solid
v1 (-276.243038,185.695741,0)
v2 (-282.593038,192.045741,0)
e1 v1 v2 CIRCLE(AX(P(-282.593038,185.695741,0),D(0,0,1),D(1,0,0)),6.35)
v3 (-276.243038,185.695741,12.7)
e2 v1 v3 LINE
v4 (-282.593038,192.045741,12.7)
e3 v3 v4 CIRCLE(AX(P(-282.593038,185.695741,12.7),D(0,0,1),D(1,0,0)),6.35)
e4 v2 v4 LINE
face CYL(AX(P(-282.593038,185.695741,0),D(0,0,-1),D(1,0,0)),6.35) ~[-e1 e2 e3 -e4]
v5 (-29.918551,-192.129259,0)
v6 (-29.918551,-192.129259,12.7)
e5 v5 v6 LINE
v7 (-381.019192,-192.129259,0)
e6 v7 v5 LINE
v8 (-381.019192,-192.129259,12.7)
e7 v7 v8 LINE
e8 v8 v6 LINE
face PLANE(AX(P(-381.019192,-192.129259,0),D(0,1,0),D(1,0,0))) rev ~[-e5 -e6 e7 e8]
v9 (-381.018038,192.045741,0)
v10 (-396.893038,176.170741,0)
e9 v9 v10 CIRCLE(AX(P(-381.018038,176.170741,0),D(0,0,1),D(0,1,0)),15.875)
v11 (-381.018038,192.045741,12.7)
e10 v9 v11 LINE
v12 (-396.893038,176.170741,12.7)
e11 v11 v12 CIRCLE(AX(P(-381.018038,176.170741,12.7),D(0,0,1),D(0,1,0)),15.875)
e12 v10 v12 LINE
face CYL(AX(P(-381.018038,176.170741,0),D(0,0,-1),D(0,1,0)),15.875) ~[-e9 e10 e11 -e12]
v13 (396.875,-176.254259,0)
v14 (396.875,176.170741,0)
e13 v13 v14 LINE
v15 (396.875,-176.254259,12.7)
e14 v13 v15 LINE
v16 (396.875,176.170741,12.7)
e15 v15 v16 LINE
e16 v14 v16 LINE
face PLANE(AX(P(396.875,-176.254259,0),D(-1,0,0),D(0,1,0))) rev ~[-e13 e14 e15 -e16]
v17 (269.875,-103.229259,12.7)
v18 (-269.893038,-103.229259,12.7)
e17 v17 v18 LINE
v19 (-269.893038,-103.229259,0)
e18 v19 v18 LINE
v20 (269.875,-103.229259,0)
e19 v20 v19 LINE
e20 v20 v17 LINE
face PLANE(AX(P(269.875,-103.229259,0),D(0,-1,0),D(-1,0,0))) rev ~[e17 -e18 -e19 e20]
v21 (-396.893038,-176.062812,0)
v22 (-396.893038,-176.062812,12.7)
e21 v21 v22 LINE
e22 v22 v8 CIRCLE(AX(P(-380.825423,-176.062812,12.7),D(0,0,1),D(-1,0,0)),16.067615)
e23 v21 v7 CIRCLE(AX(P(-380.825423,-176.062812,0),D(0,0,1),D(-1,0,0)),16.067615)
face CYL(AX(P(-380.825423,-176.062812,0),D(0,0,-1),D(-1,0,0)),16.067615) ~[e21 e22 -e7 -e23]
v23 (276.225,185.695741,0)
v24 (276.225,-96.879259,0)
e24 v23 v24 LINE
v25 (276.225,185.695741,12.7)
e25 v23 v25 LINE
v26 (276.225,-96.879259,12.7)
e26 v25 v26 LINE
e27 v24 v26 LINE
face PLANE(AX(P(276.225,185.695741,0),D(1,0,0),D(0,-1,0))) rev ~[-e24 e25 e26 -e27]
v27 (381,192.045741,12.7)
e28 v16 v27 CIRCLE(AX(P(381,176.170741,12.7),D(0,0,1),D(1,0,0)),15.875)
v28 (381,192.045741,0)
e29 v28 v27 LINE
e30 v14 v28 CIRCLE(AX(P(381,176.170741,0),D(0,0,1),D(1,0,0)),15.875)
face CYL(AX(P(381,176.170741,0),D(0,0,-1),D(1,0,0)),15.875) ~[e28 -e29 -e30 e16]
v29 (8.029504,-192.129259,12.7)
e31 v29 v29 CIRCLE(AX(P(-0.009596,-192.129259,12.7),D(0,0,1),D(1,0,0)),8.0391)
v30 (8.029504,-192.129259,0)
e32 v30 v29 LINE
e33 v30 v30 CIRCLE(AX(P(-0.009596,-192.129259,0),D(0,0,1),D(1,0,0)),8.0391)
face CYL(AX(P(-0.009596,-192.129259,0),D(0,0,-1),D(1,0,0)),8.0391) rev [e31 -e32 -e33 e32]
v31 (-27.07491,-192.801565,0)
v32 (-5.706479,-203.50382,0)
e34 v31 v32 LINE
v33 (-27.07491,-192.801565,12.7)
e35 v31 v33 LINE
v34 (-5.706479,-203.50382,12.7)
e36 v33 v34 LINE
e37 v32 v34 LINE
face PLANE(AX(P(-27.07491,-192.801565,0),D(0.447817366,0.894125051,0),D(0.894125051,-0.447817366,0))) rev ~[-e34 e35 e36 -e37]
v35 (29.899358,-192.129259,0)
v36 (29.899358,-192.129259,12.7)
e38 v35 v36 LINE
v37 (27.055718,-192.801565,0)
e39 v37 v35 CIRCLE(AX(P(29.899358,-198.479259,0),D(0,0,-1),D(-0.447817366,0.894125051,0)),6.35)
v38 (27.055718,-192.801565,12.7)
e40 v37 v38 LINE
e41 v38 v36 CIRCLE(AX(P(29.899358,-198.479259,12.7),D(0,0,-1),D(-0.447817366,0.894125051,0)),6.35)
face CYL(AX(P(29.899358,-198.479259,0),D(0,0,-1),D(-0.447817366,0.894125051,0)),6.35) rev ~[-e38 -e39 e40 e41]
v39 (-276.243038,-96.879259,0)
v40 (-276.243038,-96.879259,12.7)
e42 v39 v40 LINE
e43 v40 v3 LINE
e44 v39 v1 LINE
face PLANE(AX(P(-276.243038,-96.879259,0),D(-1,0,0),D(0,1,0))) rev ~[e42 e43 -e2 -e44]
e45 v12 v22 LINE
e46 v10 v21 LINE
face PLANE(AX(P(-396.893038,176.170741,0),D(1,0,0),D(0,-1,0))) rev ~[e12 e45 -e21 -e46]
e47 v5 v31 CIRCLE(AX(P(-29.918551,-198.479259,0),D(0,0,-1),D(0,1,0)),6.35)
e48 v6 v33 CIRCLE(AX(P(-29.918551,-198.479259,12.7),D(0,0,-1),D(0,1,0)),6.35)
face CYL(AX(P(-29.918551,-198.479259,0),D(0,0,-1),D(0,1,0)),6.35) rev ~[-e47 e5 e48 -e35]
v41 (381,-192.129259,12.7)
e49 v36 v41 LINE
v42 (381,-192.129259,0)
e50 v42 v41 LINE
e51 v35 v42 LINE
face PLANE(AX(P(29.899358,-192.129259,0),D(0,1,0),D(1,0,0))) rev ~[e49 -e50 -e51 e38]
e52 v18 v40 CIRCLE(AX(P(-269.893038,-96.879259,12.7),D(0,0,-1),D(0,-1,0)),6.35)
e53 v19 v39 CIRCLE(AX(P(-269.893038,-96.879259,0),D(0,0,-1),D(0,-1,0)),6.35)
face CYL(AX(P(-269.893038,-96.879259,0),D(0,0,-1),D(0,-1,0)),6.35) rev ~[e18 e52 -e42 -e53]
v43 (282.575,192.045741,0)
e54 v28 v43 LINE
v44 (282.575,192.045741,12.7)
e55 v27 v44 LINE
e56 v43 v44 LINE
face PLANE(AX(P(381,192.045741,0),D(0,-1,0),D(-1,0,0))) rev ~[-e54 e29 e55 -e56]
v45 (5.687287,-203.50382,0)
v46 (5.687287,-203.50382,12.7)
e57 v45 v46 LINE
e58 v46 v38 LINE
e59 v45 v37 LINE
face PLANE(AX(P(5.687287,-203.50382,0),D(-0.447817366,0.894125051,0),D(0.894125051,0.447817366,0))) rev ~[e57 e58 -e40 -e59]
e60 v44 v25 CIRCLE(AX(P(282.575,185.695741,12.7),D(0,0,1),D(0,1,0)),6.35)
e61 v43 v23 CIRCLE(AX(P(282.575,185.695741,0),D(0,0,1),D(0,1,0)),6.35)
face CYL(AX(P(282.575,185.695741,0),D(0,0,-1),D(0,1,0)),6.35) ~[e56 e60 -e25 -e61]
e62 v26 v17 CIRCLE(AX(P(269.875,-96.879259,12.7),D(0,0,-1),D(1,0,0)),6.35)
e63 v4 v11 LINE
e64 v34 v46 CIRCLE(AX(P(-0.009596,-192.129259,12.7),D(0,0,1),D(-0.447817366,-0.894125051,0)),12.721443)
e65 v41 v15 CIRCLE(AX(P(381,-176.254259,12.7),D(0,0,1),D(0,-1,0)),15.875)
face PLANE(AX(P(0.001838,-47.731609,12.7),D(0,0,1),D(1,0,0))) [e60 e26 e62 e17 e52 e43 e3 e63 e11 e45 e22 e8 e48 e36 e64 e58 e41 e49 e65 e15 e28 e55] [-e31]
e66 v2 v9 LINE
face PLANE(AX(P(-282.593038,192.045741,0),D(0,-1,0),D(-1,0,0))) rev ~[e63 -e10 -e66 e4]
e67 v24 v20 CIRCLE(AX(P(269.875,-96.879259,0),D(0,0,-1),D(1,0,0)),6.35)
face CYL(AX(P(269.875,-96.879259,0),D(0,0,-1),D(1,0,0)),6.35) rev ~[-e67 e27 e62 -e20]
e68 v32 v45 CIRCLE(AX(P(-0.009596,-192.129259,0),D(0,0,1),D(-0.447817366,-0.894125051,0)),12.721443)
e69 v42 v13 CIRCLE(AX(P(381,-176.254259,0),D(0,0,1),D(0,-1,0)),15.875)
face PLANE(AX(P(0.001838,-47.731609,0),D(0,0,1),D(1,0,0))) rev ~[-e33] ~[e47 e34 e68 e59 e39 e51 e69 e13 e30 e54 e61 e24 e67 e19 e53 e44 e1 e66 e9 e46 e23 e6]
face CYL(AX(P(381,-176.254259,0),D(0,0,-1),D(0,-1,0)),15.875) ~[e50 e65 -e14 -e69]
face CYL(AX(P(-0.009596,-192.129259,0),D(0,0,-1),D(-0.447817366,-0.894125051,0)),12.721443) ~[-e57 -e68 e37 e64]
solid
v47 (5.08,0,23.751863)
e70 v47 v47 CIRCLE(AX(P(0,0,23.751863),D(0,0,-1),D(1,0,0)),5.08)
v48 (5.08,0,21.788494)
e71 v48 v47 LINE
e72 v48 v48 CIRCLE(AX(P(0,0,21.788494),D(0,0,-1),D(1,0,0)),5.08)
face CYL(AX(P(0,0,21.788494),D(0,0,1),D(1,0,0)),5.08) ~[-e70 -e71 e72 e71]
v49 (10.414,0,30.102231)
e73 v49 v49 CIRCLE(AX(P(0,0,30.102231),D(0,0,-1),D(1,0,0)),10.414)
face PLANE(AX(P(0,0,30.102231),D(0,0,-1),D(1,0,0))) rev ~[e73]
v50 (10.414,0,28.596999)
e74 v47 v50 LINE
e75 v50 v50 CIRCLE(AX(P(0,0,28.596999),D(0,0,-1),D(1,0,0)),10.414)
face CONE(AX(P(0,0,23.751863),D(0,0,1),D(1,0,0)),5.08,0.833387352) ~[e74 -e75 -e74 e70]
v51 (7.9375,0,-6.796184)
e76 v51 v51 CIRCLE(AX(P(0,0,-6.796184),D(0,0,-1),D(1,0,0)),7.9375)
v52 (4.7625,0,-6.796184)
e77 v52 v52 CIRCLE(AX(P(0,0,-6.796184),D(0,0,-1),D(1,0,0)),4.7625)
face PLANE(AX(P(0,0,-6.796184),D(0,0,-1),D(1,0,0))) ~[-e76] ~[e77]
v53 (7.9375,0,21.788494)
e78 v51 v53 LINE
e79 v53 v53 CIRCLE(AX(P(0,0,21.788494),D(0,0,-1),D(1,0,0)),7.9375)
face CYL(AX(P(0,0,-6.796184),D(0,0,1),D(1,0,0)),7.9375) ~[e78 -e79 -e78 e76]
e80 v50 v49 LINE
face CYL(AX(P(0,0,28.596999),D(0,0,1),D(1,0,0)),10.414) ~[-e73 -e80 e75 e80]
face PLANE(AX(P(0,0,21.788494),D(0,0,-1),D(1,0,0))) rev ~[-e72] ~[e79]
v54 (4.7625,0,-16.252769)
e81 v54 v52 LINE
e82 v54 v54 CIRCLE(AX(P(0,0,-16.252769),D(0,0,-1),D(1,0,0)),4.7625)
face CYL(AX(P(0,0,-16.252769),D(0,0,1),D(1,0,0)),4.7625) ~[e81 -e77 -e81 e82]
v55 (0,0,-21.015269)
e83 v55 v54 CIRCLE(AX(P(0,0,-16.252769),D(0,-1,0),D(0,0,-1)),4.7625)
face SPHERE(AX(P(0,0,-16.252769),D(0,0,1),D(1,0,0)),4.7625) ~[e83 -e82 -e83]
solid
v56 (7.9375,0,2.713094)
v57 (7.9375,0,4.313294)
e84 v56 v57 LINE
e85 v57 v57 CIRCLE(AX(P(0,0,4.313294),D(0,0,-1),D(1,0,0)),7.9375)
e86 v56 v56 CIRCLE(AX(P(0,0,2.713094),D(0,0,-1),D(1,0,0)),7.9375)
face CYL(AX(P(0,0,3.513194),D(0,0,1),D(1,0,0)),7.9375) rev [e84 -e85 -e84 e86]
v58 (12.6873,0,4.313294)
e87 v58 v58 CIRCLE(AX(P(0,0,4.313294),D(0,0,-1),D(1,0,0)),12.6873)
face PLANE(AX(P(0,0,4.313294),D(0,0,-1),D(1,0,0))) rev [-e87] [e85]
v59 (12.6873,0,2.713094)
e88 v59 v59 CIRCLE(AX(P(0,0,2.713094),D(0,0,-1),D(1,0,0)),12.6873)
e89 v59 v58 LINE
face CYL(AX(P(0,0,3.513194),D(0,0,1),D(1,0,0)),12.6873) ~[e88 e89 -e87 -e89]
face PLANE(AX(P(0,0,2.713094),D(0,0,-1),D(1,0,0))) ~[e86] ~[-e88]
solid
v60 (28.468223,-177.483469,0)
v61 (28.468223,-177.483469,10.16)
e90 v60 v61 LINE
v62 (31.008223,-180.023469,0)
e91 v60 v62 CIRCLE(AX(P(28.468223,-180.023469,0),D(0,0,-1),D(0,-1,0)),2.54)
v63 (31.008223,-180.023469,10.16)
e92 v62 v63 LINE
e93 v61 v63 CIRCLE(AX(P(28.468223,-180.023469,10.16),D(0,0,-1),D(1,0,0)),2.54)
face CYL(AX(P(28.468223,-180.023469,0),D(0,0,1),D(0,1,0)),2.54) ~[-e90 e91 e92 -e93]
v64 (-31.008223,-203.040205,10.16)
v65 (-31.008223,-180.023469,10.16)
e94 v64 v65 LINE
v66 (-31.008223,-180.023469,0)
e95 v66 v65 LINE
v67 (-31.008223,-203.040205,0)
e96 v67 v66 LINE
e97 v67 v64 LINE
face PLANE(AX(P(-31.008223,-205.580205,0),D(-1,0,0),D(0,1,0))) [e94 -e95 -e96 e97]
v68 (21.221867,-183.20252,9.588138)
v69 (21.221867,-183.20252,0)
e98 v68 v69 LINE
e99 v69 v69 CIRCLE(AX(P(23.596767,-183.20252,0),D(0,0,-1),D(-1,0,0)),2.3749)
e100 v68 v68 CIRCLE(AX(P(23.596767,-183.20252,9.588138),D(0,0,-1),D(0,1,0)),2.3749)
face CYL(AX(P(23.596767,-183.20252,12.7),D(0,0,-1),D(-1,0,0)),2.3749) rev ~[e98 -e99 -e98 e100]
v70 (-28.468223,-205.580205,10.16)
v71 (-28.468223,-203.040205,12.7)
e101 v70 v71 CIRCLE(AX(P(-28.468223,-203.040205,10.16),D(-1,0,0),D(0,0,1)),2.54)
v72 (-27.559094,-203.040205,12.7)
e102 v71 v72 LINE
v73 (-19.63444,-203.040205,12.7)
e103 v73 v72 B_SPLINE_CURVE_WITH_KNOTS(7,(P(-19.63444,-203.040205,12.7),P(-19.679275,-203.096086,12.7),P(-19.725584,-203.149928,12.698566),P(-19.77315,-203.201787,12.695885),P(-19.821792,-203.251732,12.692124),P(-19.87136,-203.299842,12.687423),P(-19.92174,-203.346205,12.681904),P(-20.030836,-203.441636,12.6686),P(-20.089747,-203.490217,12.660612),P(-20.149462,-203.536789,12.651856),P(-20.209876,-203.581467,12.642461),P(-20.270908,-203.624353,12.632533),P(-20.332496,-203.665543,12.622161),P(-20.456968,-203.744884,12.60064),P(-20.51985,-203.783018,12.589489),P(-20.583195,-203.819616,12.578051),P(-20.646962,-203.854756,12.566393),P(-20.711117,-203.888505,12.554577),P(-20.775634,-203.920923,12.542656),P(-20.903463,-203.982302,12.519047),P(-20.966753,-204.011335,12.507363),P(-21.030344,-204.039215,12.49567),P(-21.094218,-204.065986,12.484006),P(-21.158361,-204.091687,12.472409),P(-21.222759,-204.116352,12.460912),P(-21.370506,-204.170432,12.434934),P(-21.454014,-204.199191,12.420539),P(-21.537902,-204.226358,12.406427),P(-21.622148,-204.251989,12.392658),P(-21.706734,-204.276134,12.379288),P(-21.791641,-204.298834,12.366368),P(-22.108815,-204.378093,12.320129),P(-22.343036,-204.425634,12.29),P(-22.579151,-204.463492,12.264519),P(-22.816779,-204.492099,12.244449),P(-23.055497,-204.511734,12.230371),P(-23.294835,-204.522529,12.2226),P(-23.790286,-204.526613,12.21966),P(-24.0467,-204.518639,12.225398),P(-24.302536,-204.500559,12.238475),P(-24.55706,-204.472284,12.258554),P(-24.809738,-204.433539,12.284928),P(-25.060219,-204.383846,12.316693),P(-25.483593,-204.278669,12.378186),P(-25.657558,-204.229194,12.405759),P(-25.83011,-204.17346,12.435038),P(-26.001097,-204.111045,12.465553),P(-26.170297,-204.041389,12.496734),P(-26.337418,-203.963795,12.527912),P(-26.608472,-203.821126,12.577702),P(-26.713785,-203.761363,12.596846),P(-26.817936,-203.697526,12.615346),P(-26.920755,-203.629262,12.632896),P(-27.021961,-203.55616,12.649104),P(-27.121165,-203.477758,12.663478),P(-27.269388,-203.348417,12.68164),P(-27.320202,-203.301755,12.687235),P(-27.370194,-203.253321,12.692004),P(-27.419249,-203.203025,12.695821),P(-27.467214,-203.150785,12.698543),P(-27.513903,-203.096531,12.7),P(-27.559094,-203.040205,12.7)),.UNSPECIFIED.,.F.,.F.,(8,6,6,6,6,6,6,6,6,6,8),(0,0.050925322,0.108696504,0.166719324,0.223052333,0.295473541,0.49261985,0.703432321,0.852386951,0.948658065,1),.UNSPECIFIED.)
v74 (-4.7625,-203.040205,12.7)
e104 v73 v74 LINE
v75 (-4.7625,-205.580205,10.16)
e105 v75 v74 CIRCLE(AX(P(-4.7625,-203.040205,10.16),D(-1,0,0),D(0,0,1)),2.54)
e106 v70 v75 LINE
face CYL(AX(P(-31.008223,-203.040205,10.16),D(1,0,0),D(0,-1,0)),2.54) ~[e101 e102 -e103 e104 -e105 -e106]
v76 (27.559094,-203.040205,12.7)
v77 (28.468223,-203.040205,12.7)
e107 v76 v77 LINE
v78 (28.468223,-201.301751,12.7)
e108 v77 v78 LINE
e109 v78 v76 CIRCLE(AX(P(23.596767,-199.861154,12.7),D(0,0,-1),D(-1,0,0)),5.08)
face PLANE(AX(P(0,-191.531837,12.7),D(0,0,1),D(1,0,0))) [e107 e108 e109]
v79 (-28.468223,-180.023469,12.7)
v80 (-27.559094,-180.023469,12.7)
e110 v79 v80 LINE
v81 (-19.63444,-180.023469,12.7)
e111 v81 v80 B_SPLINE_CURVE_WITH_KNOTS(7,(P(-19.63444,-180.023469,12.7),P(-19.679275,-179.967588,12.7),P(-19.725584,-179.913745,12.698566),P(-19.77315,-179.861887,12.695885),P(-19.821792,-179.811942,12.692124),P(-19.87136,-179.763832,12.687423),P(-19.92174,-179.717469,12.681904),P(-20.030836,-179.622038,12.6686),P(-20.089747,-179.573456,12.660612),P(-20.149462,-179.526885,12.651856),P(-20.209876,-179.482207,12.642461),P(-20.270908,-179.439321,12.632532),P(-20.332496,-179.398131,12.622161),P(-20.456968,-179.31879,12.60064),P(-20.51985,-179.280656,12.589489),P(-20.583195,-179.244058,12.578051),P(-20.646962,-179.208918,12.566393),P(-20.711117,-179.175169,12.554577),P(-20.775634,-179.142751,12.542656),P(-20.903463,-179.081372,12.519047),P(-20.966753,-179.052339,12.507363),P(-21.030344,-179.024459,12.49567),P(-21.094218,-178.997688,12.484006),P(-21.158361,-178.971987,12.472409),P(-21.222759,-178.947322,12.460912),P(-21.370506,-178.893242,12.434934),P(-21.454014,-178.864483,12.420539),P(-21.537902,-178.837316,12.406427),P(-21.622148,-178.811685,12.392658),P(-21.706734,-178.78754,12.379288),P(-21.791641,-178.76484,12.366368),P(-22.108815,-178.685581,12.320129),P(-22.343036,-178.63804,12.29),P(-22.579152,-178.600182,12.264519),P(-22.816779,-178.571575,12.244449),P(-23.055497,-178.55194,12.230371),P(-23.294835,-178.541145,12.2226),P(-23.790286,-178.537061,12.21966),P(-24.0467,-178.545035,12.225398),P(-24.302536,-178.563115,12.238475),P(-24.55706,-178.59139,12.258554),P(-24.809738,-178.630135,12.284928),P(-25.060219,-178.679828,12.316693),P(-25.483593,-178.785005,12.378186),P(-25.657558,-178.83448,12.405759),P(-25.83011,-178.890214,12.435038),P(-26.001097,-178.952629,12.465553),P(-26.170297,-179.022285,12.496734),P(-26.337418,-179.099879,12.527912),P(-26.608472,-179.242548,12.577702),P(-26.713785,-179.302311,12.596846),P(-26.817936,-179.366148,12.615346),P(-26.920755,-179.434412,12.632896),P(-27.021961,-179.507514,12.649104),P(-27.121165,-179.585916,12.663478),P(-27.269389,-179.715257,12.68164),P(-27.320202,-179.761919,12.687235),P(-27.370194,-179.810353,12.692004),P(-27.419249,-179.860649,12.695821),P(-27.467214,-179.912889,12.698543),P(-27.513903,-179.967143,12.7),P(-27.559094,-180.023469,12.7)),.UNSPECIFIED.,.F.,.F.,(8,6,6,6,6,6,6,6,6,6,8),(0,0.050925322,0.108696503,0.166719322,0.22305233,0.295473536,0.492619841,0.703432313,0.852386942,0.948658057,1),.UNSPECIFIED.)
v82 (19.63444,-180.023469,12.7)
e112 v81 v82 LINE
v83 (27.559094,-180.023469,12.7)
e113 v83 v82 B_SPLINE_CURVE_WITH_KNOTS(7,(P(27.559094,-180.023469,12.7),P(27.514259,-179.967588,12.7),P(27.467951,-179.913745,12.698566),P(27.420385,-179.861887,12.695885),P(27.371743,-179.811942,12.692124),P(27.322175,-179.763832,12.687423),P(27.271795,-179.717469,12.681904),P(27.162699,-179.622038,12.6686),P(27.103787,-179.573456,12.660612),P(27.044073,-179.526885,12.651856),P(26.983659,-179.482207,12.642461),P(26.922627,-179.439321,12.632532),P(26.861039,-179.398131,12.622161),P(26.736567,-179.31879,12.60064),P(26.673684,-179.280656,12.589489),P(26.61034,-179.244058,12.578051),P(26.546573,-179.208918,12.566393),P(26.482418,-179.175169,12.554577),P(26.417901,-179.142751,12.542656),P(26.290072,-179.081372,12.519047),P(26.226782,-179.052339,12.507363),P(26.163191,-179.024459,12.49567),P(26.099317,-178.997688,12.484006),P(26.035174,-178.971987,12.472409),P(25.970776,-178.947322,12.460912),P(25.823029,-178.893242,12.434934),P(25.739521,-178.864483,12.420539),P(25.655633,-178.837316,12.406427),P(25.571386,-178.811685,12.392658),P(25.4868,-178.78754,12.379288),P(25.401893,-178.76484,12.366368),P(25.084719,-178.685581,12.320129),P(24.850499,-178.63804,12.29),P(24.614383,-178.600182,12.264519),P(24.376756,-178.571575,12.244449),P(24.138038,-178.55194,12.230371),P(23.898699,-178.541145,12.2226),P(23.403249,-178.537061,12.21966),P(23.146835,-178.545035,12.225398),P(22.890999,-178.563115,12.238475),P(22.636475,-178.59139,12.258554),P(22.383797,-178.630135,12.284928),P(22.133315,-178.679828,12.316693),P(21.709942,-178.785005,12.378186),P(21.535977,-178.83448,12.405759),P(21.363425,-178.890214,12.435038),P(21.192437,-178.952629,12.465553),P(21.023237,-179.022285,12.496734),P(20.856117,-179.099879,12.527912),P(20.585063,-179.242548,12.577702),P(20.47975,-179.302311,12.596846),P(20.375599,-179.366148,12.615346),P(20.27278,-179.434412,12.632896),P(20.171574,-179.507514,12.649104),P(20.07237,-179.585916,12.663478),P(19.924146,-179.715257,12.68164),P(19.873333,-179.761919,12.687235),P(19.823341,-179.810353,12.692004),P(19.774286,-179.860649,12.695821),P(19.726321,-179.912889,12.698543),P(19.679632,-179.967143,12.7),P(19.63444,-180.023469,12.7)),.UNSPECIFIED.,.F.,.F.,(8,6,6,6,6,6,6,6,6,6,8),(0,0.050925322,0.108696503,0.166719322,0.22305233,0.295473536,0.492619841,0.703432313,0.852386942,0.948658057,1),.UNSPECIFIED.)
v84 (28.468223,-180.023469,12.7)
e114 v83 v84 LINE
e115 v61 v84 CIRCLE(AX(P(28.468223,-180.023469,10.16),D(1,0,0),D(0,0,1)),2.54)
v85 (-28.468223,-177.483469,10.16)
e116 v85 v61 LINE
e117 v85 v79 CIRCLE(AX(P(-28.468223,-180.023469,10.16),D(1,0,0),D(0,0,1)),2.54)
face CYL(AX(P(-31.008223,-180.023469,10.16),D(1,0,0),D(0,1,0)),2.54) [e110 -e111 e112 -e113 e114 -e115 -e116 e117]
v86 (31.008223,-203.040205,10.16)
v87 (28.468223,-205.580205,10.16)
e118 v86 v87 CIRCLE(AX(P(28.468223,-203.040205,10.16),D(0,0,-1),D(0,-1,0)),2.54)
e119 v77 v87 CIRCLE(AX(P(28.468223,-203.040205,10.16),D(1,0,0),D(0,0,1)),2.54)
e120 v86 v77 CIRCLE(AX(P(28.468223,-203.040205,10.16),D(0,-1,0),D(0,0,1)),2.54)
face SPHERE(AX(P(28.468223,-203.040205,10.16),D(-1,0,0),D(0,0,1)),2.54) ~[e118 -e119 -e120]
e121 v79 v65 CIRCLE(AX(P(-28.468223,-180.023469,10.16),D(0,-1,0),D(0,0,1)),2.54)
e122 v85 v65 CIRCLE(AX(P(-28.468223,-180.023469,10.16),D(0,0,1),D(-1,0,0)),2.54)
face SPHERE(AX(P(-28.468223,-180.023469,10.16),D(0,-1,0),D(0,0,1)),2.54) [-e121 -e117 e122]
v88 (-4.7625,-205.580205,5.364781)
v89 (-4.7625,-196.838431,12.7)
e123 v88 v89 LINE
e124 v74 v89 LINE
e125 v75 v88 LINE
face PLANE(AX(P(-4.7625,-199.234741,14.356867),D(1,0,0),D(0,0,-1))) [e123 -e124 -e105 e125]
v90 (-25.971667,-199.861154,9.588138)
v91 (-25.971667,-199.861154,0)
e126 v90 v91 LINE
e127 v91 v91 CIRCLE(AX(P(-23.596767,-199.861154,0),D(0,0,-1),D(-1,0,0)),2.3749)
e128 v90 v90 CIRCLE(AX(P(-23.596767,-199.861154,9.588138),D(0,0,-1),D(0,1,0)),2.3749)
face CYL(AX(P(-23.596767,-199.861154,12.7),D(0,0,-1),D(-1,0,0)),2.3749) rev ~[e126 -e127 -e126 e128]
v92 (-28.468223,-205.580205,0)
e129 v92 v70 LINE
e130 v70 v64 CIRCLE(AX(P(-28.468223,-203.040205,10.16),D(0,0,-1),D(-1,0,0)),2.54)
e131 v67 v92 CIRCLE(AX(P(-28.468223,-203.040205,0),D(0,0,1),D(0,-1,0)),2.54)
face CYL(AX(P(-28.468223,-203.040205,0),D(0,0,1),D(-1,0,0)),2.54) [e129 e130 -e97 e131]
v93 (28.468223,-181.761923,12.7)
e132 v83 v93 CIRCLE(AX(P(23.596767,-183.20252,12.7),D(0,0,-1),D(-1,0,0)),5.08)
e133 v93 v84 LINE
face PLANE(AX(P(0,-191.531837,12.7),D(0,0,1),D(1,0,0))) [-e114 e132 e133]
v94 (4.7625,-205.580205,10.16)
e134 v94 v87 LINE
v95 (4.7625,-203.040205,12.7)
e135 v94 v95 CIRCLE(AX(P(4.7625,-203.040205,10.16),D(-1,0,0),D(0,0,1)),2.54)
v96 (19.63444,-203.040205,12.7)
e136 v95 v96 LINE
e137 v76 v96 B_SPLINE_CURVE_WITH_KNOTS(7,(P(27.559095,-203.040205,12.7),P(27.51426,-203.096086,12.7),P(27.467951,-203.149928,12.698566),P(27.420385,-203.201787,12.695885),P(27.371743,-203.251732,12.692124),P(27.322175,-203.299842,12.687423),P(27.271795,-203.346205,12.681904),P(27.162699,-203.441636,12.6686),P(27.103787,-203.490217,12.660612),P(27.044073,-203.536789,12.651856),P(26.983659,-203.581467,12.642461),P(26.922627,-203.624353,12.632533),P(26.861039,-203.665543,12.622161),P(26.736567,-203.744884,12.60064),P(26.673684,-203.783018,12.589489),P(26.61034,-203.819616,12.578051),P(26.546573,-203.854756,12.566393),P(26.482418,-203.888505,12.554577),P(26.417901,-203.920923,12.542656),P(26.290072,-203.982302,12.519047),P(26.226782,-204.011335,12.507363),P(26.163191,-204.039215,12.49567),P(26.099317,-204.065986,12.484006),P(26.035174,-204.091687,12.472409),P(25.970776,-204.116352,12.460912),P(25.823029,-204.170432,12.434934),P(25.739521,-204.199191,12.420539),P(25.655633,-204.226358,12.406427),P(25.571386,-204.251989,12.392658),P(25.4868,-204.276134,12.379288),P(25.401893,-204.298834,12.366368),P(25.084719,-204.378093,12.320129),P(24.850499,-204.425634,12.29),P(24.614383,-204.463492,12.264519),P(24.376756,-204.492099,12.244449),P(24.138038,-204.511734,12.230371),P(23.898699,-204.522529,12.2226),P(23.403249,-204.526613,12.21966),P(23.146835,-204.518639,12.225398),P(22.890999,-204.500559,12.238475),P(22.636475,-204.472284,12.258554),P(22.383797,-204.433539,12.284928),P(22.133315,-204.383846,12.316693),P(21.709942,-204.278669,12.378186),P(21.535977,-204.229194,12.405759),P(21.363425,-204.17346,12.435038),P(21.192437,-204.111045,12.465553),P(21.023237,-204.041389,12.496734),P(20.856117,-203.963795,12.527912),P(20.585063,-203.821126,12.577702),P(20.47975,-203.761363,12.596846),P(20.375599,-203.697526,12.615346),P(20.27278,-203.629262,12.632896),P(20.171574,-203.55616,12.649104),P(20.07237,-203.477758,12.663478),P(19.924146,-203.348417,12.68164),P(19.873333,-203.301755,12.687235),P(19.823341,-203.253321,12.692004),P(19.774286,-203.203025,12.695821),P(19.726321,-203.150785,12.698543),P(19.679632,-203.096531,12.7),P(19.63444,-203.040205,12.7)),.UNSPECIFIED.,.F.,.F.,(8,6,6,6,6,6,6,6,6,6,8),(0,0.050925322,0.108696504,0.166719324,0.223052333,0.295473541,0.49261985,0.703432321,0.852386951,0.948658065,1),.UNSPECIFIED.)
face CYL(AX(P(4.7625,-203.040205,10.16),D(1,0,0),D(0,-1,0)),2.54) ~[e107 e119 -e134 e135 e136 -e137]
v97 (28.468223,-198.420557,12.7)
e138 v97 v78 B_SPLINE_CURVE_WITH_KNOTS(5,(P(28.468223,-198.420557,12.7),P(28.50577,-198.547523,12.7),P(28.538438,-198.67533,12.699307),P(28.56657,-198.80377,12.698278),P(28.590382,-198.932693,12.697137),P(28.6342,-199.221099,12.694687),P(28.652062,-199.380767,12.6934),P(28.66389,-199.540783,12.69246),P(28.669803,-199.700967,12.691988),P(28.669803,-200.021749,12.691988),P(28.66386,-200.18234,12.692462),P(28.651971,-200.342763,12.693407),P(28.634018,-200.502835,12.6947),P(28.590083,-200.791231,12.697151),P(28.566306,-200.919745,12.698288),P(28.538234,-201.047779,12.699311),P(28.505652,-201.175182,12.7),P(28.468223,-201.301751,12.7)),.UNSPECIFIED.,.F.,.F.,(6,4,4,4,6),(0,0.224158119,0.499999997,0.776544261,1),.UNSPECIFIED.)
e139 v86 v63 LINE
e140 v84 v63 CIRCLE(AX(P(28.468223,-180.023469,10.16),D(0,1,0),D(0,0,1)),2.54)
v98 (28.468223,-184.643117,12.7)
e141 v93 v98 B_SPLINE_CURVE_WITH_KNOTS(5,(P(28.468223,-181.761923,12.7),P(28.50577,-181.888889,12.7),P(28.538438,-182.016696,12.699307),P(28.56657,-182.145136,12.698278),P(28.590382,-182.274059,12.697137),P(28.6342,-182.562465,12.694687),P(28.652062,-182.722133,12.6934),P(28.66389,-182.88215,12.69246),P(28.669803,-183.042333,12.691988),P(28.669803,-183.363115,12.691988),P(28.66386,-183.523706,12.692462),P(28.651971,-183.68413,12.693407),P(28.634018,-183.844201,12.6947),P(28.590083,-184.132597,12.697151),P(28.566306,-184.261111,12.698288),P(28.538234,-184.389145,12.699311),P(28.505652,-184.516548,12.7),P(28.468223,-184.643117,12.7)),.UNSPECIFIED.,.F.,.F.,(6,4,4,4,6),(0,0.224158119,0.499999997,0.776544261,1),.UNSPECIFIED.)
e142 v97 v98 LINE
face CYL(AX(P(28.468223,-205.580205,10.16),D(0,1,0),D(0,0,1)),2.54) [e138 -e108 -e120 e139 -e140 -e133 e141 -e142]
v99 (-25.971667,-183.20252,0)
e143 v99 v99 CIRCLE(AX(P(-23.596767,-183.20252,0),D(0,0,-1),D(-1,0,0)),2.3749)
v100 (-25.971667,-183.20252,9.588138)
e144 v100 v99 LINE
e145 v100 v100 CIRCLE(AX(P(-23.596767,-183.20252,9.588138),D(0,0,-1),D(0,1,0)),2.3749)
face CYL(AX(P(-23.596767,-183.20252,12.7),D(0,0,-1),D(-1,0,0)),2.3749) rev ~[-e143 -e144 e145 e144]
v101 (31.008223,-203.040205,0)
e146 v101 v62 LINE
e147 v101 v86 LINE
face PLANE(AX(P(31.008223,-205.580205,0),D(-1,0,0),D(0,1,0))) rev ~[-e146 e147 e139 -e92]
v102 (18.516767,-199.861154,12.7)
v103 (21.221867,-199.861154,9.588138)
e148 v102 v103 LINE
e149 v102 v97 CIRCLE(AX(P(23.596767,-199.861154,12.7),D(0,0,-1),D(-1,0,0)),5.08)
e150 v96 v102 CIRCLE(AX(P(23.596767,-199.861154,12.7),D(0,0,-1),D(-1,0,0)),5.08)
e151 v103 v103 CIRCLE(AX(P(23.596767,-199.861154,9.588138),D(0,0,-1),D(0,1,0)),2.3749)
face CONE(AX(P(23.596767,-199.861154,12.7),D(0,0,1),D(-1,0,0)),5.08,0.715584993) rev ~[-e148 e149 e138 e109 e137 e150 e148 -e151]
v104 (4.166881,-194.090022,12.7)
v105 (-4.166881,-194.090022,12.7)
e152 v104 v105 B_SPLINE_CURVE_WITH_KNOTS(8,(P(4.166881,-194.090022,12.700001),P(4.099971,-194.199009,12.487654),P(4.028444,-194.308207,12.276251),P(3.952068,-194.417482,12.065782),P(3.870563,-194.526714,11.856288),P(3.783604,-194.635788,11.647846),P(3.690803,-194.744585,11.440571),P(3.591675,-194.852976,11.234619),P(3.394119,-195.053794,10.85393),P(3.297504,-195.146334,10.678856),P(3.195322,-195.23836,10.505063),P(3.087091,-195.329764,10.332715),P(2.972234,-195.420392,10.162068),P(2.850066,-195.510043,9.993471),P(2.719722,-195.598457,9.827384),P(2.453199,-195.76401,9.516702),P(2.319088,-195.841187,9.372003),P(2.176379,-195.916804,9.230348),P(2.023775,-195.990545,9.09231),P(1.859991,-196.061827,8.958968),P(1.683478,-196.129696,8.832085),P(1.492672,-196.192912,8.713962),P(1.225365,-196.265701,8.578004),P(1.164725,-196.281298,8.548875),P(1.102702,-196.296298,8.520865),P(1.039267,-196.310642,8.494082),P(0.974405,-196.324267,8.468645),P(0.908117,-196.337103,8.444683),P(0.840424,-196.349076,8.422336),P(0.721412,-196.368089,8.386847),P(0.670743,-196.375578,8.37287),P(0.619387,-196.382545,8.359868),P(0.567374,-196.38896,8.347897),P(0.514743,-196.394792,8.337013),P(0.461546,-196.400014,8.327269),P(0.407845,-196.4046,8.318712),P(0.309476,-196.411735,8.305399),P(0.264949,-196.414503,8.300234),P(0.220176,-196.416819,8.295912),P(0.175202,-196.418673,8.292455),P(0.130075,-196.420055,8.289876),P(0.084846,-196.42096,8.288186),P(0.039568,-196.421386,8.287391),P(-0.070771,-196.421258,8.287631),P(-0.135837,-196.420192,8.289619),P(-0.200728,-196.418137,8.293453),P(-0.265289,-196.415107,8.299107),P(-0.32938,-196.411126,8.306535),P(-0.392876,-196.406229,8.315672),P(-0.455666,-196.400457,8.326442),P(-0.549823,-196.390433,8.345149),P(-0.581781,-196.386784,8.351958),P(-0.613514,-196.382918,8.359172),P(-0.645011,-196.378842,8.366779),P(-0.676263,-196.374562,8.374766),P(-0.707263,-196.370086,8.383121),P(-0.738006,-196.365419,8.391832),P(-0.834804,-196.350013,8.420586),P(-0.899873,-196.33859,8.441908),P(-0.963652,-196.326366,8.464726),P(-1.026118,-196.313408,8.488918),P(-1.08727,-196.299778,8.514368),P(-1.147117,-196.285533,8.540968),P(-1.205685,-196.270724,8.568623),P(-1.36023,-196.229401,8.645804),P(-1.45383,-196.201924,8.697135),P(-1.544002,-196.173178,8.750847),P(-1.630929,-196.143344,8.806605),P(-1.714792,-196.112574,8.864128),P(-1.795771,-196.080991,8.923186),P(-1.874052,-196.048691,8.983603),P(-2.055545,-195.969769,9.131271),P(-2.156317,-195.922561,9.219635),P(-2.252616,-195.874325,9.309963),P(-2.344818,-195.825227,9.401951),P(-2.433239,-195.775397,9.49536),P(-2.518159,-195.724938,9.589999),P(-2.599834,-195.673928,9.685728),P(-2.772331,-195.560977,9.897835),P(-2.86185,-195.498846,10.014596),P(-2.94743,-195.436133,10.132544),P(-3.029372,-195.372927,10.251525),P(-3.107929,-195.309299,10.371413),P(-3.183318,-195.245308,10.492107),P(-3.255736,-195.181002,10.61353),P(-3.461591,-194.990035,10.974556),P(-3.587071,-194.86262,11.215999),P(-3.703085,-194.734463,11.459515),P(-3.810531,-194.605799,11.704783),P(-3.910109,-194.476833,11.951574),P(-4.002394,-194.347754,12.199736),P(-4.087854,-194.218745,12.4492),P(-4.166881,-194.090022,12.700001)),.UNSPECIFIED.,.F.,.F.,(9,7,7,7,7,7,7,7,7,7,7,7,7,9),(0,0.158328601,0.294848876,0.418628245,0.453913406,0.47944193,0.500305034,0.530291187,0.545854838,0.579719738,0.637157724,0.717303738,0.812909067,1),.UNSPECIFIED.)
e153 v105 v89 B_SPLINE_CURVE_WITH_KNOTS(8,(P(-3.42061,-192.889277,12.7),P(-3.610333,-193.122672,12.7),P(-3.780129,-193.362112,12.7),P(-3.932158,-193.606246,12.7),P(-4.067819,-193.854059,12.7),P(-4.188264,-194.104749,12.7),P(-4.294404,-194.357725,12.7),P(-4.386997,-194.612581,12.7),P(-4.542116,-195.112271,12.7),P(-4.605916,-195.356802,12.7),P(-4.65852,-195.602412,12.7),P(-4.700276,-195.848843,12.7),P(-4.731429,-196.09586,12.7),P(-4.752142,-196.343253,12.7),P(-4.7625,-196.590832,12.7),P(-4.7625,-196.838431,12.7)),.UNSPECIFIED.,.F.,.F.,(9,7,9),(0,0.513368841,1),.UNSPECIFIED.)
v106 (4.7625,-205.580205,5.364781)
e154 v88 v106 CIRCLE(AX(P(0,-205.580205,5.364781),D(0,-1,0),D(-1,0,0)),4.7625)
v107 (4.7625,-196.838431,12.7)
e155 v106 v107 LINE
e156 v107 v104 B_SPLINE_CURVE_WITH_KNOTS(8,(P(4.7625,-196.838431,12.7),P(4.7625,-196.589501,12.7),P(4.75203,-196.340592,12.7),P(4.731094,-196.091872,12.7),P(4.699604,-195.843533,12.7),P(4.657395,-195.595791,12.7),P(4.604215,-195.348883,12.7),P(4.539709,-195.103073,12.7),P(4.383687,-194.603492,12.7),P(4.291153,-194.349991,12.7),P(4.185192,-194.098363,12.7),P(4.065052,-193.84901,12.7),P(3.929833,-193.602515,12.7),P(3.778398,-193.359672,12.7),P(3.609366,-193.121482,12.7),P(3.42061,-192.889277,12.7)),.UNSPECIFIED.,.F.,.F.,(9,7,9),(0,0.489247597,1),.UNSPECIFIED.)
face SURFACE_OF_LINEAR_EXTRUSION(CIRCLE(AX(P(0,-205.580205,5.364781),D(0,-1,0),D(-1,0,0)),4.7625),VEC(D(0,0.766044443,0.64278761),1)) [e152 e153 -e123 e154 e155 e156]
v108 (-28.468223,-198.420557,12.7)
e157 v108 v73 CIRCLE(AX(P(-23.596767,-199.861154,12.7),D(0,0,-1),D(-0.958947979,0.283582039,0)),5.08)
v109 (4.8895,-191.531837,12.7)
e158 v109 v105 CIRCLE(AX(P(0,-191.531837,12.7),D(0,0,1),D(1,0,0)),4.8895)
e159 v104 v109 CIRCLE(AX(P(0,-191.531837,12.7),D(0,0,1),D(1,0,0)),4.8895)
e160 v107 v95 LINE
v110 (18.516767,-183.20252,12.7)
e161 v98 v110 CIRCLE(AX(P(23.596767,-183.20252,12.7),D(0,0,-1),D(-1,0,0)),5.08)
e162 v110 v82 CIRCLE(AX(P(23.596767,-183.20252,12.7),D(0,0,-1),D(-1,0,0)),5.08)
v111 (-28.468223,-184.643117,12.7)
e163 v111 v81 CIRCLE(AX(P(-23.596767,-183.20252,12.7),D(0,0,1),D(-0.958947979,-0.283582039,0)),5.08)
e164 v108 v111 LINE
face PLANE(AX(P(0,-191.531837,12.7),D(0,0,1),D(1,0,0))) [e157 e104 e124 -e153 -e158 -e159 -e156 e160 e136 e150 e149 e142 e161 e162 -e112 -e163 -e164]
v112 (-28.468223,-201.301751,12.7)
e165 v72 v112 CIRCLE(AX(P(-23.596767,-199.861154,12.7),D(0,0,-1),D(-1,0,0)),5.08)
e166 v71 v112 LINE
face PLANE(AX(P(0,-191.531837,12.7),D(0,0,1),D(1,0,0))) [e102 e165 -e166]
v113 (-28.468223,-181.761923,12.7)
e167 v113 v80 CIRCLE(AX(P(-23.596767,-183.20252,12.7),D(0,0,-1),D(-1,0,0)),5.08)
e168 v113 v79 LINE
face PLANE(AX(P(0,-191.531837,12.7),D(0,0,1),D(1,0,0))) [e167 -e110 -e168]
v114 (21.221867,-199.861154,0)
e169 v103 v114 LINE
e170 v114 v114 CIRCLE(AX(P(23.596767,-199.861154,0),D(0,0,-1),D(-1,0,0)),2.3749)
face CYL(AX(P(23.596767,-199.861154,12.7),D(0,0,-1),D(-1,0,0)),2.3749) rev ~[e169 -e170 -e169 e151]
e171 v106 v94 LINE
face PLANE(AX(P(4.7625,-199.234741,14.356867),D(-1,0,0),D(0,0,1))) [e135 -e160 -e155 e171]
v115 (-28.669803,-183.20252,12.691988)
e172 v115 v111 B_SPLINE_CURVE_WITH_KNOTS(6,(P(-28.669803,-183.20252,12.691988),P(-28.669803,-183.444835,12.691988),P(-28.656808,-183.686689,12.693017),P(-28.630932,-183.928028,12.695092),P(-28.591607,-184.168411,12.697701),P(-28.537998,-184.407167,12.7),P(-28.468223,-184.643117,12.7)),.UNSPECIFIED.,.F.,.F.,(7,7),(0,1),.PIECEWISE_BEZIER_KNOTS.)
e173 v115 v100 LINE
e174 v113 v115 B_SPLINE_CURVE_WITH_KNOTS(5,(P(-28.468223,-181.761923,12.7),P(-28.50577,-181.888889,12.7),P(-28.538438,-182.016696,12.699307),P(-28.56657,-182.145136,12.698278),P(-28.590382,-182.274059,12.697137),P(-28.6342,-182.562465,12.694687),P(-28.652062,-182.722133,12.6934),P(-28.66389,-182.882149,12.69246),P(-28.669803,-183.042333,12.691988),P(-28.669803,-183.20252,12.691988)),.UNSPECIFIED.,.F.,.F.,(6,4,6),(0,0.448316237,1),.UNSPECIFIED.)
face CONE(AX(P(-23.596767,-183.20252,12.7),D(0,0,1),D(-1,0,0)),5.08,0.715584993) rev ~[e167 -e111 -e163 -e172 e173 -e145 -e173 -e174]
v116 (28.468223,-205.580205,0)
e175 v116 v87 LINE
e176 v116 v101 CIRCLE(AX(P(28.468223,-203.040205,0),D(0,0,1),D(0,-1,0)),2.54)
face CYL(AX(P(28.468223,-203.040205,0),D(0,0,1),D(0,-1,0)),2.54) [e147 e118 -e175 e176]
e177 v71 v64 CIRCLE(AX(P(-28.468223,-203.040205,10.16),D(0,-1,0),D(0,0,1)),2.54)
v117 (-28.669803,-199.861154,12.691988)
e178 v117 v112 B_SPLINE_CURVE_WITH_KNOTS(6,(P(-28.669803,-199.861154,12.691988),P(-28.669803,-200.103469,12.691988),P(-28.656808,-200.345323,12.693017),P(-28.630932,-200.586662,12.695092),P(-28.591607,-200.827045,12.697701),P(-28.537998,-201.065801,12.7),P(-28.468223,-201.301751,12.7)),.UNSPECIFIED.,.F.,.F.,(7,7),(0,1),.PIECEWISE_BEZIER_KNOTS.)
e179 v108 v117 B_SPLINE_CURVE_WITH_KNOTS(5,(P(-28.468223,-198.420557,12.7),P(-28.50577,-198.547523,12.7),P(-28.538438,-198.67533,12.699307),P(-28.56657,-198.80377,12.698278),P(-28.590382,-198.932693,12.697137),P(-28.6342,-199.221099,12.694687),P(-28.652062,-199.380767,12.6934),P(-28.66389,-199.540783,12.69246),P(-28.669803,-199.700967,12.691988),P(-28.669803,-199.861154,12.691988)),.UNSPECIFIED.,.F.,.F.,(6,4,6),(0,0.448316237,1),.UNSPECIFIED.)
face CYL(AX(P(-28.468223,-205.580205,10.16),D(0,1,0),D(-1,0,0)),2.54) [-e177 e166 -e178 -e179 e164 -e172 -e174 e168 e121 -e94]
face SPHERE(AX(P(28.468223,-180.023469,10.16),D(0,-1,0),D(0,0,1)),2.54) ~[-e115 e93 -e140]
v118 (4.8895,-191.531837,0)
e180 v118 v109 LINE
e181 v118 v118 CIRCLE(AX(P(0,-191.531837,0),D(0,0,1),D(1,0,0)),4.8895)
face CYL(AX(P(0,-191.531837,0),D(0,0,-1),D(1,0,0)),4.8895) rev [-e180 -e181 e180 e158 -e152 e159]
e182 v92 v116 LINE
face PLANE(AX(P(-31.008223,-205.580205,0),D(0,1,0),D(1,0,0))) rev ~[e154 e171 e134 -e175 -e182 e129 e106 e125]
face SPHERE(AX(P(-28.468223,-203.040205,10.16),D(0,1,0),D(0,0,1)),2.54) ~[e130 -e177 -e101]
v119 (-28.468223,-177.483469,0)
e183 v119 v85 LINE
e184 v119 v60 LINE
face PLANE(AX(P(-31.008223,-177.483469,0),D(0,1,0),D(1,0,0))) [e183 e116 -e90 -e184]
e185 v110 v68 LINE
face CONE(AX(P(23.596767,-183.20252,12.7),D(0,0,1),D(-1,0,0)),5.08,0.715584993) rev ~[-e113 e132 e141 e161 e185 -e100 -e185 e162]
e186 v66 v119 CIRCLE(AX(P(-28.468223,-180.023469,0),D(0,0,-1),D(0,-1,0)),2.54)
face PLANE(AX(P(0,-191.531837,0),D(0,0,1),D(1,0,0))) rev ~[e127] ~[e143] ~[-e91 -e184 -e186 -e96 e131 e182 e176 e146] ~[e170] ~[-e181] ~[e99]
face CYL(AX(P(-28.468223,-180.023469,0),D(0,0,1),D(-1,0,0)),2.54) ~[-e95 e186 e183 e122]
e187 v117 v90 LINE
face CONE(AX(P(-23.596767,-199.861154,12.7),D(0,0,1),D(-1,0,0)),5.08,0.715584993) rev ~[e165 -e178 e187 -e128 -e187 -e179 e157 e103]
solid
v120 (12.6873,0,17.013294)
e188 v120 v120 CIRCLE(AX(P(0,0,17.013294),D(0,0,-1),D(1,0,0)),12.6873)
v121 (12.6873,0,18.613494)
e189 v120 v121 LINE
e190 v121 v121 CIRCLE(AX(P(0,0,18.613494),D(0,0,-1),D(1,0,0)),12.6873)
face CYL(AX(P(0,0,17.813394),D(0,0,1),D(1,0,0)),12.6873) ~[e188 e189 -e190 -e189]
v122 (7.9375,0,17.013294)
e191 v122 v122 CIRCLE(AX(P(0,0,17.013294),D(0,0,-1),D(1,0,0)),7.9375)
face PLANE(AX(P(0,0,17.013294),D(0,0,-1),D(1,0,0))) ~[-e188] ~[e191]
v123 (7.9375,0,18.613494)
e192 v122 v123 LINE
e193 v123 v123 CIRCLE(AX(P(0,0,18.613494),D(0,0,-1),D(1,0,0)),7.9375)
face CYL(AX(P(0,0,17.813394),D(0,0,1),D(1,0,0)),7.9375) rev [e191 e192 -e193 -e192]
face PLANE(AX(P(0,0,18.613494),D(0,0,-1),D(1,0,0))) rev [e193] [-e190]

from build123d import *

# Parameters (mm, degrees)
F0_R           = 8.0391
F1_DEPTH       = 12.7
F2_W           = 62.0164461434
F2_H           = 28.0967354774
F2_R           = 4.8895
F3_DEPTH       = 12.7
F7_R           = 2.54
F9_D           = 4.7498
F9_CSINK_D     = 10.16
F9_CSINK_ANGLE = 82
F10_W          = 4.7498
F10_H          = 1.6002


with BuildPart() as f1:
    # F0 (on Top) → F1 (new body)
    with BuildSketch(Plane.XY):
        with BuildLine():
            ThreePointArc((-396.8930379433, -176.0628120543), (-392.25524501, -187.3556160105), (-381.0191923747, -192.1292588187))
            Line((-381.0191923747, -192.1292588187), (-29.9185505861, -192.1292588187))
            ThreePointArc((-29.9185505861, -192.1292588187), (-28.4575333665, -192.2996205863), (-27.0749103125, -192.801564745))
            Line((-27.0749103125, -192.801564745), (-5.7064793941, -203.503819913))
            ThreePointArc((-5.7064793941, -203.503819913), (-0.0095961873, -204.8507020685), (5.6872870194, -203.503819913))
            Line((5.6872870194, -203.503819913), (27.0557179378, -192.801564745))
            ThreePointArc((27.0557179378, -192.801564745), (28.4383409918, -192.2996205863), (29.8993582114, -192.1292588187))
            Line((29.8993582114, -192.1292588187), (381, -192.1292588187))
            ThreePointArc((381, -192.1292588187), (392.2253201513, -187.4795789701), (396.875, -176.2542588187))
            Line((396.875, -176.2542588187), (396.875, 176.1707411813))
            ThreePointArc((396.875, 176.1707411813), (392.2253201513, 187.3960613326), (381, 192.0457411813))
            Line((381, 192.0457411813), (282.575, 192.0457411813))
            ThreePointArc((282.575, 192.0457411813), (278.0848719395, 190.1858692418), (276.225, 185.6957411813))
            Line((276.225, 185.6957411813), (276.225, -96.8792588187))
            ThreePointArc((276.225, -96.8792588187), (274.3651280605, -101.3693868793), (269.875, -103.2292588187))
            Line((269.875, -103.2292588187), (-269.8930379433, -103.2292588187))
            ThreePointArc((-269.8930379433, -103.2292588187), (-274.3831660038, -101.3693868793), (-276.2430379433, -96.8792588187))
            Line((-276.2430379433, -96.8792588187), (-276.2430379433, 185.6957411813))
            ThreePointArc((-276.2430379433, 185.6957411813), (-278.1029098828, 190.1858692418), (-282.5930379433, 192.0457411813))
            Line((-282.5930379433, 192.0457411813), (-381.0180379433, 192.0457411813))
            ThreePointArc((-381.0180379433, 192.0457411813), (-392.2433580946, 187.3960613326), (-396.8930379433, 176.1707411813))
            Line((-396.8930379433, 176.1707411813), (-396.8930379433, -176.0628120543))
        make_face()
        with Locations((-0.0095961873, -192.1292588187)):
            Circle(F0_R, mode=Mode.SUBTRACT)
    extrude(amount=F1_DEPTH)


with BuildPart() as f3:
    # F2 (on Top) → F3 (new body)
    with BuildSketch(Plane.XY):
        with Locations((0, -191.5318369865)):
            Rectangle(F2_W, F2_H)
        with Locations((0, -191.5318369865)):
            Circle(F2_R, mode=Mode.SUBTRACT)
    extrude(amount=F3_DEPTH)

    # F6: sweep along a path in F4
    with BuildLine(Plane.YZ) as f6_path:
        Line((-205.5802047253, 2.0510469544), (-192.8892766759, 12.7))
    # F5 (on face) → F6 (sweep, cut)
    with BuildSketch(Plane.XZ.offset(205.5802047253)):
        with BuildLine():
            Line((-4.7625, 12.7), (-4.7625, 5.3647807799))
            ThreePointArc((-4.7625, 5.3647807799), (0, 0.6022807799), (4.7625, 5.3647807799))
            Line((4.7625, 5.3647807799), (4.7625, 12.7))
            Line((4.7625, 12.7), (-4.7625, 12.7))
        make_face()
    sweep(path=f6_path.line, mode=Mode.SUBTRACT)

    # F7
    f7_edges = [f3.edges().sort_by_distance(p)[0] for p in [
        (-31.008223, -191.531837, 12.7),
        (-17.885362, -205.580205, 12.7),
        (17.885362, -205.580205, 12.7),
        (31.008223, -191.531837, 12.7),
        (0, -177.483469, 12.7),
        (31.008223, -205.580205, 6.35),
        (31.008223, -177.483469, 6.35),
        (-31.008223, -205.580205, 6.35),
        (-31.008223, -177.483469, 6.35),
    ]]
    fillet(f7_edges, radius=F7_R)

    # F9 (through all)
    with Locations(Plane.XY.offset(12.7)):
        with Locations((-23.5967673361, -183.2025200129), (23.5967673361, -183.2025200129), (23.5967673361, -199.8611539602), (-23.5967673361, -199.8611539602)):
            CounterSinkHole(F9_D / 2, F9_CSINK_D / 2, counter_sink_angle=F9_CSINK_ANGLE)


with BuildPart() as f11:
    # F10 (on Front) → F11 (revolve)
    with BuildSketch(Plane.XZ):
        with BuildLine():
            ThreePointArc((0, -21.0152691894), (3.3675960454, -19.6203652348), (4.7625, -16.2527691894))
            Line((4.7625, -16.2527691894), (4.7625, -6.796184157))
            Line((4.7625, -6.796184157), (7.9375, -6.796184157))
            Line((7.9375, -6.796184157), (7.9375, 2.7130942824))
            Line((7.9375, 2.7130942824), (7.9375, 4.3132942824))
            Line((7.9375, 4.3132942824), (7.9375, 17.0132942824))
            Line((7.9375, 17.0132942824), (7.9375, 18.6134942824))
            Line((7.9375, 18.6134942824), (7.9375, 21.7884942824))
            Line((7.9375, 21.7884942824), (5.08, 21.7884942824))
            Line((5.08, 21.7884942824), (5.08, 23.7518632694))
            Line((5.08, 23.7518632694), (10.414, 28.596999448))
            Line((10.414, 28.596999448), (10.414, 30.1022308106))
            Line((10.414, 30.1022308106), (0, 30.1022308106))
            Line((0, 30.1022308106), (0, -21.0152691894))
        make_face()
    revolve(axis=Axis((0, 0, 4.5434808106), (0, 0, -1)))


with BuildPart() as f12:
    # F10 (on Front) → F12 (revolve)
    with BuildSketch(Plane.XZ):
        with Locations((10.3124, 17.8133942824)):
            Rectangle(F10_W, F10_H)
    revolve(axis=Axis((0, 0, 4.5434808106), (0, 0, -1)))


with BuildPart() as f12b:
    # F10 (on Front) → F12, piece 2 (revolve)
    with BuildSketch(Plane.XZ):
        with Locations((10.3124, 3.5131942824)):
            Rectangle(F10_W, F10_H)
    revolve(axis=Axis((0, 0, 4.5434808106), (0, 0, -1)))


solid = Compound([f1.part, f3.part, f11.part, f12.part, f12b.part])
